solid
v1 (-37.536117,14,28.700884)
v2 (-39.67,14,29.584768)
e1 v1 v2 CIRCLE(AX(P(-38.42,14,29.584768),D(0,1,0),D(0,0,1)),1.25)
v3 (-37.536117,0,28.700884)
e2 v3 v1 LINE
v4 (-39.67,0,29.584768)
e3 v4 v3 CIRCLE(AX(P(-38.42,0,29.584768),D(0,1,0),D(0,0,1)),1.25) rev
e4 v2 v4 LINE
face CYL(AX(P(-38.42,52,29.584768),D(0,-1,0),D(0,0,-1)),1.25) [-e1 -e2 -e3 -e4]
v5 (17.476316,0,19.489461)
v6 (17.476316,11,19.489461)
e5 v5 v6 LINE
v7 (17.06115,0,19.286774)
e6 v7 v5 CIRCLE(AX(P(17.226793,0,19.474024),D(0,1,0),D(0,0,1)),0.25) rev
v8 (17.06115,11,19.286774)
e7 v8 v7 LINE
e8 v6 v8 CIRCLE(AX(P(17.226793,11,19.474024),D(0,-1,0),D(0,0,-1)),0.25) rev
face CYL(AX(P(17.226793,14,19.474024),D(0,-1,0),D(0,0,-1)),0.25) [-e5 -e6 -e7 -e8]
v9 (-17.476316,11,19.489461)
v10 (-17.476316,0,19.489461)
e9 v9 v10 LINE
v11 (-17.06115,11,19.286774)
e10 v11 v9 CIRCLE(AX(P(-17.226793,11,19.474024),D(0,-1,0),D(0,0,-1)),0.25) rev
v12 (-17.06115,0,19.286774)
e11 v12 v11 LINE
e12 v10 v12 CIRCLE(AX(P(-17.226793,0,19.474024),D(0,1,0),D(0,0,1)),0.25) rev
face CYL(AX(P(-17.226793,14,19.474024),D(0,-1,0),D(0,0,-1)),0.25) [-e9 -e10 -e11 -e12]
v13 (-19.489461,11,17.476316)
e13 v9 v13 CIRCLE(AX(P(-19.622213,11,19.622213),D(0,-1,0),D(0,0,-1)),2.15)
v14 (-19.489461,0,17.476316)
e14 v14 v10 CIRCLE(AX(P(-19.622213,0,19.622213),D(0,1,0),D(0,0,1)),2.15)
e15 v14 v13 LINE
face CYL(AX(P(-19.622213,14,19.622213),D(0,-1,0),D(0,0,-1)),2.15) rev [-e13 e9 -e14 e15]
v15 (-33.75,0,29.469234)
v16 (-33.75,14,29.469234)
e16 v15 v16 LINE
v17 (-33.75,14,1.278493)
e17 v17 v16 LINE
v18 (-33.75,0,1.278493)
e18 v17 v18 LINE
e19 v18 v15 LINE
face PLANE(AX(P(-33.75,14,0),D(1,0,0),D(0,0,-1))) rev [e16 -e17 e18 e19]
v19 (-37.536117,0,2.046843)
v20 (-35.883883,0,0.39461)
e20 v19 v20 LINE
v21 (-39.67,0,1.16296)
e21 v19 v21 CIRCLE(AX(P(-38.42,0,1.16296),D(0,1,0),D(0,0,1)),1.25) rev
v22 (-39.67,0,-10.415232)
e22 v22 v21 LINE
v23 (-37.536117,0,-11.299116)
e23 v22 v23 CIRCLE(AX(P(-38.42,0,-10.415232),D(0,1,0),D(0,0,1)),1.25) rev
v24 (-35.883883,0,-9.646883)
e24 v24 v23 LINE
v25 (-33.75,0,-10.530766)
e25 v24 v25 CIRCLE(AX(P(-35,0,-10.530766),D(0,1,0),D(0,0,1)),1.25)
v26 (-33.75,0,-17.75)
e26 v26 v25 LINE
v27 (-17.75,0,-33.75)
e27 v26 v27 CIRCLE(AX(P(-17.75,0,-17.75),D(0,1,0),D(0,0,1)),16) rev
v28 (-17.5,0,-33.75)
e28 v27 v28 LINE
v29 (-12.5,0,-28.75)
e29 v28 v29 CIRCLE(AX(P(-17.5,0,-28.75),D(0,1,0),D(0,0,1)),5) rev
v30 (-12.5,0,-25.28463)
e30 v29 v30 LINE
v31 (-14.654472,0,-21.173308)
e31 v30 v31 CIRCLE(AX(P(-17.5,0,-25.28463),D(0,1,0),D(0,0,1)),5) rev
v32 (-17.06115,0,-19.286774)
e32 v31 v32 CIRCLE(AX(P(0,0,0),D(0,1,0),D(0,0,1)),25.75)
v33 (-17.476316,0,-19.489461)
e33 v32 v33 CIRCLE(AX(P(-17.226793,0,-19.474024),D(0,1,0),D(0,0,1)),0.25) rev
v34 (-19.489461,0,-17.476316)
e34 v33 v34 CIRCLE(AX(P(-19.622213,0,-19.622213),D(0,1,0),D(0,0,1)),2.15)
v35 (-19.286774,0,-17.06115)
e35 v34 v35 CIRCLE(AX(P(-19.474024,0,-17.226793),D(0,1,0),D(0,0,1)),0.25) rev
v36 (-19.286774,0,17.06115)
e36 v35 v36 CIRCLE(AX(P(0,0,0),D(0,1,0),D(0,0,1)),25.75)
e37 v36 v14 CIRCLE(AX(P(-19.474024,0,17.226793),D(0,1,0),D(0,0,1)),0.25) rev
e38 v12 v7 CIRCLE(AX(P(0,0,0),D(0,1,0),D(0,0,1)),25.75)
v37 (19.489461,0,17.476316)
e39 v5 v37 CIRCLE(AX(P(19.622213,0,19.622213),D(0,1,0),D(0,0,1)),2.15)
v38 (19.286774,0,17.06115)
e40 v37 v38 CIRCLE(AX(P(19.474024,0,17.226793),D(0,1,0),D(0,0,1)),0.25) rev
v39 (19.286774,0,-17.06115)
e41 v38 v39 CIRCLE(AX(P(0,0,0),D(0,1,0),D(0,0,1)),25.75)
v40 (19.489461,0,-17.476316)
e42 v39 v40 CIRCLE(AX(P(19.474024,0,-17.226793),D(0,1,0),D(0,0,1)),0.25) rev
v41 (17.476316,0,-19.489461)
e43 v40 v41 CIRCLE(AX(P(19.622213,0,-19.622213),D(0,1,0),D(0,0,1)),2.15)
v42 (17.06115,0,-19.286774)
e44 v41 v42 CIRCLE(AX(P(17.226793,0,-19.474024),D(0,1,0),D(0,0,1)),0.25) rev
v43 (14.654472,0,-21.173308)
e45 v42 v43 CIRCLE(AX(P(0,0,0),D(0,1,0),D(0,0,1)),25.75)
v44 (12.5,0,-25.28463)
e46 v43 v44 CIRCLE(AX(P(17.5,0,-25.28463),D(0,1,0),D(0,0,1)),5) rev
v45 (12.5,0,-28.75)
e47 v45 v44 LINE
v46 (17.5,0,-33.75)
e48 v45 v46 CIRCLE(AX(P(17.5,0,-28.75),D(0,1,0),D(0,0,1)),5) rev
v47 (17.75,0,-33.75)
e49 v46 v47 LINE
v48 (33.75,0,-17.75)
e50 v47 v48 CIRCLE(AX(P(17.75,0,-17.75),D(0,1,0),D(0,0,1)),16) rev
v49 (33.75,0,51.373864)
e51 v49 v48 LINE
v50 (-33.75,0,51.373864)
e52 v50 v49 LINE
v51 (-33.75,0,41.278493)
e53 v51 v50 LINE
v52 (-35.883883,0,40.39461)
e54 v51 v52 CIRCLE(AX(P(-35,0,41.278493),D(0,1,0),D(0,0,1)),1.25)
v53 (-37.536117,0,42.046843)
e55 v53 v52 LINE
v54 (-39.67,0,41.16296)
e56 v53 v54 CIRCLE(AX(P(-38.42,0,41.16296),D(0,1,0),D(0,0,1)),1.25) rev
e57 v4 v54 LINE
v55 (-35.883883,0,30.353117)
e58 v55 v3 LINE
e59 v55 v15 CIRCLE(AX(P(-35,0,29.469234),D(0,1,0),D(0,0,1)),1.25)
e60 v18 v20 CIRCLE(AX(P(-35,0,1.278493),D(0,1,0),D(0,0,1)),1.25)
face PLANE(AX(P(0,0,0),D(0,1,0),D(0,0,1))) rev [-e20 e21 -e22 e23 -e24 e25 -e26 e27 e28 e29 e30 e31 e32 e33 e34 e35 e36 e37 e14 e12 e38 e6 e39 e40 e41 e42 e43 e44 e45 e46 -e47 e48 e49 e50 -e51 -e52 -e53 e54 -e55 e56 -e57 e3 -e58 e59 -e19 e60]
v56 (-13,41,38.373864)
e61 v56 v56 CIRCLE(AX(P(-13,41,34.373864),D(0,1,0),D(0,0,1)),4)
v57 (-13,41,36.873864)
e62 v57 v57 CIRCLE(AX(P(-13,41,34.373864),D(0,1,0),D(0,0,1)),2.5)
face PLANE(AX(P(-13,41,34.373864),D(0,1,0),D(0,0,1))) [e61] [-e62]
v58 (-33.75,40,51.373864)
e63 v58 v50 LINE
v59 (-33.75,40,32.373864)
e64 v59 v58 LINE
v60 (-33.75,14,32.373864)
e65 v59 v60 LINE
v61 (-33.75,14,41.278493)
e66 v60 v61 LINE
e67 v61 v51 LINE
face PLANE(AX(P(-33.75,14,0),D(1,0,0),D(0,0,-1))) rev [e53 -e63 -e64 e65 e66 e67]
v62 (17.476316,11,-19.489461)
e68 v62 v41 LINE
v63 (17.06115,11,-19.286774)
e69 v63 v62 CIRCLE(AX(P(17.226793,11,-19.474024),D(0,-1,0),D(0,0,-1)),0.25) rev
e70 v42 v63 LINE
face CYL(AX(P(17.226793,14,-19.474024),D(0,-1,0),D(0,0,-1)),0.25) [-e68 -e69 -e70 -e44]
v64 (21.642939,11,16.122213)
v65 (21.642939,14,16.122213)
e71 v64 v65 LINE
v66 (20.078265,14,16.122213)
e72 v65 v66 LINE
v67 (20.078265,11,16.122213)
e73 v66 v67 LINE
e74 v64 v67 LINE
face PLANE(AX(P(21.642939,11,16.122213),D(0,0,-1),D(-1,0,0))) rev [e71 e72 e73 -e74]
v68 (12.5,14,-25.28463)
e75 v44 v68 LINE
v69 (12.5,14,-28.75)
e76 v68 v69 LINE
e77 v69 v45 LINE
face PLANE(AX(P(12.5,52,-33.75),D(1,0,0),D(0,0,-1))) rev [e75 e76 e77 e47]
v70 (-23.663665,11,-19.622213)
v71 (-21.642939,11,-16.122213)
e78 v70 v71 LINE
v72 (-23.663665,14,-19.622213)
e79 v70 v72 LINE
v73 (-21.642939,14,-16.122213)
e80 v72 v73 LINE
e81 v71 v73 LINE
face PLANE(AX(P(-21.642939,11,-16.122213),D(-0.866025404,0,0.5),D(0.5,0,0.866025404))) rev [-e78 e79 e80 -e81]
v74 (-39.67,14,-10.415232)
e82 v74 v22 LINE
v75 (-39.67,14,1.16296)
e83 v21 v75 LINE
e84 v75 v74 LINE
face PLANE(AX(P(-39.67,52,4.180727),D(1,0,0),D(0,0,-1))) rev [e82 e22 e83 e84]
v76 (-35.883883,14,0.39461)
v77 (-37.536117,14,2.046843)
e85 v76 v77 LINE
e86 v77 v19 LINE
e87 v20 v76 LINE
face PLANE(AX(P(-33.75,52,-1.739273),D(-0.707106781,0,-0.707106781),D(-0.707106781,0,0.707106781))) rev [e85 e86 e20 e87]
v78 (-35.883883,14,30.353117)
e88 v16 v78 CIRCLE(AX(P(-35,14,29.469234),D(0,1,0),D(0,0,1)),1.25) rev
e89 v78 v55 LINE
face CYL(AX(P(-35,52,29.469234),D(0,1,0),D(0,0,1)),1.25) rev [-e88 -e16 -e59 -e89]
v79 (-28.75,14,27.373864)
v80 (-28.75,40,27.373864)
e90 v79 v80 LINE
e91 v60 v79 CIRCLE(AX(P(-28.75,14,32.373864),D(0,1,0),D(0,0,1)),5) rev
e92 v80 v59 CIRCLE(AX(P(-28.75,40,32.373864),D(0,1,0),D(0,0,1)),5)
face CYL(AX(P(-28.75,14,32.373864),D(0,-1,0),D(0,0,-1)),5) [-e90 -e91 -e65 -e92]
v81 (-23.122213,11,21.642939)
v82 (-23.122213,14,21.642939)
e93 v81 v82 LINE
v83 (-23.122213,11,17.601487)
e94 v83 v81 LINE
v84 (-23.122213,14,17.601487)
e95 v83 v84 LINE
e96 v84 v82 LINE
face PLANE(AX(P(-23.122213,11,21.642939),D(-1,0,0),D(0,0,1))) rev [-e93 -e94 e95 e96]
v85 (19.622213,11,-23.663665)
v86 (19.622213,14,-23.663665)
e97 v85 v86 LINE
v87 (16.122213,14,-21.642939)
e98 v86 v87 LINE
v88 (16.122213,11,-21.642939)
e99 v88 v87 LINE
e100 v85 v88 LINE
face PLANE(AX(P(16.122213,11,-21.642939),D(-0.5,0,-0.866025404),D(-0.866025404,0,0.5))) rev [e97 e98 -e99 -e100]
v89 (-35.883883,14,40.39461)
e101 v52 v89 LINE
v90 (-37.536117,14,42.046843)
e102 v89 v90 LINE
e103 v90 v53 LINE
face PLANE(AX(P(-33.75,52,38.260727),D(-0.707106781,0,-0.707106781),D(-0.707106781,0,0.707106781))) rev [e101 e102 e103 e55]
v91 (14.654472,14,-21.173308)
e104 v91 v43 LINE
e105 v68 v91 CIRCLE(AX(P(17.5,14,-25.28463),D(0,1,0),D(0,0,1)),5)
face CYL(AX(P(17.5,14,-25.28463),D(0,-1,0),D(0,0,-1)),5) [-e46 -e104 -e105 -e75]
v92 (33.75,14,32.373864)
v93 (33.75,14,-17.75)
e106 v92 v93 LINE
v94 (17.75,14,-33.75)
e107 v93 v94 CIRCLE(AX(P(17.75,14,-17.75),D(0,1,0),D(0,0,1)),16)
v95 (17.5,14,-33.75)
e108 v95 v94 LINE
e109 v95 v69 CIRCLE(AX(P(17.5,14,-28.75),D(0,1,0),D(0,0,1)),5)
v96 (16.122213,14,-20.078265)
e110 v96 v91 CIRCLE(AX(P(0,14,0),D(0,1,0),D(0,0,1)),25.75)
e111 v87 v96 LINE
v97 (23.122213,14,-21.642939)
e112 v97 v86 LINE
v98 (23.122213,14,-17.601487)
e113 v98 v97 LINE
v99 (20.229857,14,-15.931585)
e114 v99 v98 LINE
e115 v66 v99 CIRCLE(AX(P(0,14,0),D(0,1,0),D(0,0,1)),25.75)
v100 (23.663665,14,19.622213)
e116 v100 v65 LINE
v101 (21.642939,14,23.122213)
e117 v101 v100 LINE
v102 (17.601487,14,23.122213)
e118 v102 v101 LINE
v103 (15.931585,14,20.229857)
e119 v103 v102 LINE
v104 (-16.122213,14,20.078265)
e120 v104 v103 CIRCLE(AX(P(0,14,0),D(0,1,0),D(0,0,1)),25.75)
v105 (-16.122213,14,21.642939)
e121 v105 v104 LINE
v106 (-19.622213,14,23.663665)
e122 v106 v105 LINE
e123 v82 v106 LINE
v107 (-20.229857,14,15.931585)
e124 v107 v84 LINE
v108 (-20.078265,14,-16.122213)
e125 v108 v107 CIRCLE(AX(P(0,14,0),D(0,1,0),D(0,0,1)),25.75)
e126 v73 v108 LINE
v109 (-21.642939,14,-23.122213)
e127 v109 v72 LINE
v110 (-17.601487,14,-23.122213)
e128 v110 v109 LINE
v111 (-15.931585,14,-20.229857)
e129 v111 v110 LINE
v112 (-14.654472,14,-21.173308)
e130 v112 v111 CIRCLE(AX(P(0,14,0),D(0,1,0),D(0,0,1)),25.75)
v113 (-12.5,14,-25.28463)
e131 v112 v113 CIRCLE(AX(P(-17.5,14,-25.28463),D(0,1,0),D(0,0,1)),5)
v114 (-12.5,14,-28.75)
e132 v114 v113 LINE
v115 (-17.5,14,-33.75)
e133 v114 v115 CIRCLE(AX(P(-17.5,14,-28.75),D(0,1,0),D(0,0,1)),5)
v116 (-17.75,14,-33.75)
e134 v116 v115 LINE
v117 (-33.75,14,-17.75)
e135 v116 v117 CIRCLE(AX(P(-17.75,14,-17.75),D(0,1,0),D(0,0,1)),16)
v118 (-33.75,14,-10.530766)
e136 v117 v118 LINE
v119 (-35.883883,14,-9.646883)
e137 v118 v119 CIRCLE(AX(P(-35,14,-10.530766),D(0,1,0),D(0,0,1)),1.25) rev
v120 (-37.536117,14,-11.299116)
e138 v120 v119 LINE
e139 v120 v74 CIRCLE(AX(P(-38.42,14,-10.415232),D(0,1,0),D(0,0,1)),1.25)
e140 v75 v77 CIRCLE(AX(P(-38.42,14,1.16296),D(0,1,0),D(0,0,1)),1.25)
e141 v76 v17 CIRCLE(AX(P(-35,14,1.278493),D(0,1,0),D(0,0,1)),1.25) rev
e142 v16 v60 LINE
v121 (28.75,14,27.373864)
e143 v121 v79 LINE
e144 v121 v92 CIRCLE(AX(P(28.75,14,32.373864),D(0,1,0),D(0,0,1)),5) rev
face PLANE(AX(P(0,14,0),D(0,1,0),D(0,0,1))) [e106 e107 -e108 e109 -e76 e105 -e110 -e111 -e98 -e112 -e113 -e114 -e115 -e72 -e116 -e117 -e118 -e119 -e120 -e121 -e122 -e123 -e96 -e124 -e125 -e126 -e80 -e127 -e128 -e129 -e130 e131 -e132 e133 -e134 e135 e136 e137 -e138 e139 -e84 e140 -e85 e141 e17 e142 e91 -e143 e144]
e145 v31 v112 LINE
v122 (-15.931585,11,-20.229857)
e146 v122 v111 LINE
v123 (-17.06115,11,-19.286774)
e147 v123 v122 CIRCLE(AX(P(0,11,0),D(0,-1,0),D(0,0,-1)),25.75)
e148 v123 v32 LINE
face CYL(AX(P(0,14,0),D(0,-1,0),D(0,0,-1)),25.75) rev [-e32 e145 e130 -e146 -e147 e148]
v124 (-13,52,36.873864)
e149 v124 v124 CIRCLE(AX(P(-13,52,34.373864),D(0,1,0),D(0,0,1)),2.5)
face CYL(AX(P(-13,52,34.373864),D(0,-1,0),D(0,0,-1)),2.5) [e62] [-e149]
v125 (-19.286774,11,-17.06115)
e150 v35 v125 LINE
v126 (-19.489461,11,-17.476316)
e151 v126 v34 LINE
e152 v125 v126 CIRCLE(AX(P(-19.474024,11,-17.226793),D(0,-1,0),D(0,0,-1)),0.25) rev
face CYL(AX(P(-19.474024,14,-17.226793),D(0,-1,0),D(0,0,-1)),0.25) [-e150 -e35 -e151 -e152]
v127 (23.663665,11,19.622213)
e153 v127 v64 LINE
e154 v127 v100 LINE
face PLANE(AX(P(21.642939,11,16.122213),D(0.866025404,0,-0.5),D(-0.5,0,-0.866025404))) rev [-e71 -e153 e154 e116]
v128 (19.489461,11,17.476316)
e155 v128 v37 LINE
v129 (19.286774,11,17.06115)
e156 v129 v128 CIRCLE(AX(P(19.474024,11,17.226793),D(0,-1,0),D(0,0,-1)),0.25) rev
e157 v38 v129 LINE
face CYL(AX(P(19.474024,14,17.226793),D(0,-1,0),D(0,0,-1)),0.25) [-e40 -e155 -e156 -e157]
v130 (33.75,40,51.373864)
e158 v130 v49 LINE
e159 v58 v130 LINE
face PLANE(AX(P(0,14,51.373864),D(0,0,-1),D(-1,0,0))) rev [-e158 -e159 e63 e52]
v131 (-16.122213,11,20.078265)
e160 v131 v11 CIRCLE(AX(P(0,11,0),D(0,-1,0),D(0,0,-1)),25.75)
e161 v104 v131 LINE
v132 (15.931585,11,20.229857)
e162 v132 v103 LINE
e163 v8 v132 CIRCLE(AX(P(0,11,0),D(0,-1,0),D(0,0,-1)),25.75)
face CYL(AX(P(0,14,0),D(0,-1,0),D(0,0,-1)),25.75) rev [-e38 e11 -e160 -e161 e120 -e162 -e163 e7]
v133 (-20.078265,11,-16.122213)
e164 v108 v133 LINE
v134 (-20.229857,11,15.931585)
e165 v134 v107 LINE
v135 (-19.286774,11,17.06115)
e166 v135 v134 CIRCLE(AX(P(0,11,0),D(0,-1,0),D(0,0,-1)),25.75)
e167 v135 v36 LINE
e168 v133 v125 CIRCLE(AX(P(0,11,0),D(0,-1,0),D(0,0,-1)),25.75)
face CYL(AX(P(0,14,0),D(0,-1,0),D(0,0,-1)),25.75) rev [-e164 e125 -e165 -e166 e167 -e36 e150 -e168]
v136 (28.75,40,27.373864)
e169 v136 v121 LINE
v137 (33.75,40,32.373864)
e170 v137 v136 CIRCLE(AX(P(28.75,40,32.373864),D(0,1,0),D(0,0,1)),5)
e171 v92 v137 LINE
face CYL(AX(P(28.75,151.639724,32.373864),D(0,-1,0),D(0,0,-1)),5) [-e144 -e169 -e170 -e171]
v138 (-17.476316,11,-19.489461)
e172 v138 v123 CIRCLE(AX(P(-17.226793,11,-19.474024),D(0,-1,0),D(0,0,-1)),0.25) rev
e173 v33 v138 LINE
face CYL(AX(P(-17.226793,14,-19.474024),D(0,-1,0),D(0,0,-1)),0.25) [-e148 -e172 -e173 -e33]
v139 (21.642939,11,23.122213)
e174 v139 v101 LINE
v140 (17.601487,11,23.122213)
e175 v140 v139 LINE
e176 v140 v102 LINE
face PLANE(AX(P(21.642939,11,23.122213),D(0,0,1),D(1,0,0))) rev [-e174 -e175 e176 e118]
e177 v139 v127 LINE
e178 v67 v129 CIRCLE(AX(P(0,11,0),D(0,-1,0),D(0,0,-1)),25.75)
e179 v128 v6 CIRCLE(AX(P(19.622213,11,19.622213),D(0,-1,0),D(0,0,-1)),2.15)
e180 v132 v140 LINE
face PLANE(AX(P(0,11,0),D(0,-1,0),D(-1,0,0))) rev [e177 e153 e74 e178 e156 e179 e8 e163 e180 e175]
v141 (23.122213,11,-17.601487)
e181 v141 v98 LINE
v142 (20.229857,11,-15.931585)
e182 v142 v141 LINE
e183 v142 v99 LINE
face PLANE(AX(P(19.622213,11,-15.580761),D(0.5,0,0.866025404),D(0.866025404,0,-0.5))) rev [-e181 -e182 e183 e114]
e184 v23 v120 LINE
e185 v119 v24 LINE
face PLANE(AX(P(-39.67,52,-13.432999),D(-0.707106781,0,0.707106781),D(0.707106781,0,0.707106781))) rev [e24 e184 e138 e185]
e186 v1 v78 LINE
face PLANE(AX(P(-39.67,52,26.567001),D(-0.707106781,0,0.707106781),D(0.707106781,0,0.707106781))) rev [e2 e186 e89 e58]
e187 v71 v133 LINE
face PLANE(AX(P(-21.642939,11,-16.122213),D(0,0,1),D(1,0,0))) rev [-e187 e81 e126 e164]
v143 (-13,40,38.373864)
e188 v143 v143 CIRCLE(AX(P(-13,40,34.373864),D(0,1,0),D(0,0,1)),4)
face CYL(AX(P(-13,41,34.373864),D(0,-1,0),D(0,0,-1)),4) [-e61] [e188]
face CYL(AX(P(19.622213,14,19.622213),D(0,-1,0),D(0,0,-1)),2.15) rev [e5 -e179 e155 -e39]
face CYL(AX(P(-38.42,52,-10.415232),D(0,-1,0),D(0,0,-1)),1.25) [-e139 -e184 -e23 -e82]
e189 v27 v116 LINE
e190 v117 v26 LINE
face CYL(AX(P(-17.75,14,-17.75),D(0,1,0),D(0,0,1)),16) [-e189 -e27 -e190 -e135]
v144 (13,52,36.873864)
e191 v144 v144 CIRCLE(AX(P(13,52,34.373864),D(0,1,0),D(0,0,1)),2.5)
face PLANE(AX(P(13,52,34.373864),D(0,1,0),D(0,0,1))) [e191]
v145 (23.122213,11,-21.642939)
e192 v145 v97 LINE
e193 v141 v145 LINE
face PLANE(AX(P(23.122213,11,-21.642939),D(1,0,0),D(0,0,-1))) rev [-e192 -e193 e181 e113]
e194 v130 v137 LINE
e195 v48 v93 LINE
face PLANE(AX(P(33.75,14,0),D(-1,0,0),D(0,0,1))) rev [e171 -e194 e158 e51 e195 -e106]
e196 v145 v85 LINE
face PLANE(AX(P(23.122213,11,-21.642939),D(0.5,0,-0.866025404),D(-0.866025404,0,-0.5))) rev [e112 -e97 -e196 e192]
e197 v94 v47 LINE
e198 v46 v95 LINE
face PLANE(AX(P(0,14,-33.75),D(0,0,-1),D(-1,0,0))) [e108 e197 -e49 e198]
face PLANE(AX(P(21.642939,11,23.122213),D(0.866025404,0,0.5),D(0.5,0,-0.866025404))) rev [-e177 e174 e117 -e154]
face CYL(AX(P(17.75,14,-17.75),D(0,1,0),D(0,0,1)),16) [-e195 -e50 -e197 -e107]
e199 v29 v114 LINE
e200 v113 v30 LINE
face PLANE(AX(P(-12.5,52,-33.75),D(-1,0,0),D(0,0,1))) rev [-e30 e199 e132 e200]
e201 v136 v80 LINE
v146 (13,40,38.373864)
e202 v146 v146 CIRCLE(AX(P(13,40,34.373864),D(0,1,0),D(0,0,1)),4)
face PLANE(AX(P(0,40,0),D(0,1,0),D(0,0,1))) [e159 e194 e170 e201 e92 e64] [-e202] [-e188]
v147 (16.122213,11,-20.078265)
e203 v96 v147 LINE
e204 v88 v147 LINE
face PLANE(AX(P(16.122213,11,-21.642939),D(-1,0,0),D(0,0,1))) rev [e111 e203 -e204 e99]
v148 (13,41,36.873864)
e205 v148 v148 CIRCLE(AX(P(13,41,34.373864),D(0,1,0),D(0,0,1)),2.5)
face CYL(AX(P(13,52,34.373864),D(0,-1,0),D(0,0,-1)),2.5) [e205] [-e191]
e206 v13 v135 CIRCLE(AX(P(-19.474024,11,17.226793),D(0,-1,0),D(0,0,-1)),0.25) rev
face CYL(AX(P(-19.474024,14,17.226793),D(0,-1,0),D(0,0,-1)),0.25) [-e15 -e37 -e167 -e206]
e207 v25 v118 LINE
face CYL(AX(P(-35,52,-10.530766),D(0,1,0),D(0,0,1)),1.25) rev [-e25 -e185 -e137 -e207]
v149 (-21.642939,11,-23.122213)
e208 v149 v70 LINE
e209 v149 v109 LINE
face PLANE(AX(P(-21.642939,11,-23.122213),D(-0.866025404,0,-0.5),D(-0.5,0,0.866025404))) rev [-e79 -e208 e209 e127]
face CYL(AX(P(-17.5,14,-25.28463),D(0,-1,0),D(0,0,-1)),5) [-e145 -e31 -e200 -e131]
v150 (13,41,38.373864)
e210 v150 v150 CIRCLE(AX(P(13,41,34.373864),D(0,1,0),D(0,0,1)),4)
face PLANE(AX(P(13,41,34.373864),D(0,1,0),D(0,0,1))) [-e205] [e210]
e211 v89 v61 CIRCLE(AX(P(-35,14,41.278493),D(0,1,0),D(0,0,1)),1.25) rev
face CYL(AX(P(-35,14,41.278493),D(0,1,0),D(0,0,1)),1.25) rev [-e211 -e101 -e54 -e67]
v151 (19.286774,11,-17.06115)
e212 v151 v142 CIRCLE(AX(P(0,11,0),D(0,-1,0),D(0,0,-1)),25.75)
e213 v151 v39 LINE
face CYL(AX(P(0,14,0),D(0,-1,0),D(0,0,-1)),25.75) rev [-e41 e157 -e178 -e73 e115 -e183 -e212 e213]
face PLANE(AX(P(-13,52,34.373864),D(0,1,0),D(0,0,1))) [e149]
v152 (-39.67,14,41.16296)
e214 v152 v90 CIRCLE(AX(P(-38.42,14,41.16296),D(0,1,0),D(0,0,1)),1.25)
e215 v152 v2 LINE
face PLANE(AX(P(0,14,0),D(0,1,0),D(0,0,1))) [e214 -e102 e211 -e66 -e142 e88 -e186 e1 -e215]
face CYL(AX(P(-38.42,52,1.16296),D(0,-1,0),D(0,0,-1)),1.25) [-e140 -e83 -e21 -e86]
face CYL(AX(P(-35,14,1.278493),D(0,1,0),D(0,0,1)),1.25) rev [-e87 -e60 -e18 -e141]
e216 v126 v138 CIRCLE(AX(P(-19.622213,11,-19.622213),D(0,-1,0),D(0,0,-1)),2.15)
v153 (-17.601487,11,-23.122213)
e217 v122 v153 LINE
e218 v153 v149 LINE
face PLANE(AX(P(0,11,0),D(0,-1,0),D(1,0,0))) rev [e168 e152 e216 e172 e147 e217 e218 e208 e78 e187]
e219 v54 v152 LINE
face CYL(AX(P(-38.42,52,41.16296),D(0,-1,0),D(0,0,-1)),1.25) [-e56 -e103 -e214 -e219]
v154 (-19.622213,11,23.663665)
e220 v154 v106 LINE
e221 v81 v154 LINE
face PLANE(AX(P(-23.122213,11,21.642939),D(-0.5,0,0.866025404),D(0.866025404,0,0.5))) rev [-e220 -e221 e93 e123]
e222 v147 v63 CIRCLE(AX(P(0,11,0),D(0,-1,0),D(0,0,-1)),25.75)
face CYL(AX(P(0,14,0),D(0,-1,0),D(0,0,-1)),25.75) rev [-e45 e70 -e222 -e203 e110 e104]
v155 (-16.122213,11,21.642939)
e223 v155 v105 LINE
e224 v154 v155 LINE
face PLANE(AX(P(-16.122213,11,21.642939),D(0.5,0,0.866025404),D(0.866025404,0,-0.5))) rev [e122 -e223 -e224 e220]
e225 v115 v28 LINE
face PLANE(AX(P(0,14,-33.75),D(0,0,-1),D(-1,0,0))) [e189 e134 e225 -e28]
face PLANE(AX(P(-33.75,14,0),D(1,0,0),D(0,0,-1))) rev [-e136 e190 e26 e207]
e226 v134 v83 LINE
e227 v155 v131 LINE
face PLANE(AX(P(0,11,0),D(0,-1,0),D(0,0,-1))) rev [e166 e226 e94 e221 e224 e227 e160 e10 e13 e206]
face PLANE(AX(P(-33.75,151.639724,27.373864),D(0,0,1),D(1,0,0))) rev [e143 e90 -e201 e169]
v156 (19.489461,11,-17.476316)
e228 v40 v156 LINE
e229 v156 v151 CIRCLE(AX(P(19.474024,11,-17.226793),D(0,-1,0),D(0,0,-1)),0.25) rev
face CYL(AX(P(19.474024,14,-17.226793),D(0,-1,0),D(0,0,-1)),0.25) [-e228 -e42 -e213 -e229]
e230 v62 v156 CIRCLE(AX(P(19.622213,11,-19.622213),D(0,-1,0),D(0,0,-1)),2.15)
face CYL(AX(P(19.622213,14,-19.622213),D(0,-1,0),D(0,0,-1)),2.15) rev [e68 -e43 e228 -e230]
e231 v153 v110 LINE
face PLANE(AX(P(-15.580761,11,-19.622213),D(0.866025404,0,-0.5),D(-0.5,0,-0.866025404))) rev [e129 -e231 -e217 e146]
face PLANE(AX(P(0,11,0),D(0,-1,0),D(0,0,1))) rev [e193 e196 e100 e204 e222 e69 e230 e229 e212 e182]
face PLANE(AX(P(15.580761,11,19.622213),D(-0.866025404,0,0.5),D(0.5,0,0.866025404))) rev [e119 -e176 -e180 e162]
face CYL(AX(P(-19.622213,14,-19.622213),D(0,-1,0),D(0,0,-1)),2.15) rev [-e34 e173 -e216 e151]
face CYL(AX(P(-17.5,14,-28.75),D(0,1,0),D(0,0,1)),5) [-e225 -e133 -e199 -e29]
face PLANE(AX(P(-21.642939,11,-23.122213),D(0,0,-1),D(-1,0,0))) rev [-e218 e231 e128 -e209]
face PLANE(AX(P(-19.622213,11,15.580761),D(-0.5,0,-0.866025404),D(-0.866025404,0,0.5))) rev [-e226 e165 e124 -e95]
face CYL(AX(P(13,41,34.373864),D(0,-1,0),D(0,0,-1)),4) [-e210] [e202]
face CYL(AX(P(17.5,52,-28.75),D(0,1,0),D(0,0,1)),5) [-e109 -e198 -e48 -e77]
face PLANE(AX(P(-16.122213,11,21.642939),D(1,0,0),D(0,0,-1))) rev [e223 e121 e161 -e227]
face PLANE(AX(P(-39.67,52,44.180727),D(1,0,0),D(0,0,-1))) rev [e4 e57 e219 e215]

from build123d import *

# Parameters (mm, degrees)
SKETCH1_W           = 67.5
SKETCH1_H           = 85.123863618
BOSS_EXTRUDE1_DEPTH = 14
SKETCH2_W           = 67.5
SKETCH2_H           = 24
BOSS_EXTRUDE2_DEPTH = 26
SKETCH3_R           = 2.5
BOSS_EXTRUDE3_DEPTH = 12
FILLET1_R           = 0.25
SKETCH4_R           = 4
BOSS_EXTRUDE4_DEPTH = 1
SKETCH5_W           = 25
SKETCH5_H           = 20
CUT_EXTRUDE1_DEPTH  = 81.512957839
FILLET2_R           = 5
FILLET3_R           = 16
BOSS_EXTRUDE5_DEPTH = 14
CUT_EXTRUDE2_DEPTH  = 84.206588569
FILLET4_START       = -1
FILLET4_DEPTH       = 15
FILLET4_2_DEPTH     = 14
CUT_EXTRUDE3_DEPTH  = 3
CIRPATTERN1_COUNT   = 4


with BuildPart() as part:
    # Sketch1 → Boss-Extrude1 (new body)
    with BuildSketch(Plane(origin=(0, 0, 0), x_dir=(1, 0, 0), z_dir=(0, 1, 0))):
        with Locations((0, -8.811931809)):
            Rectangle(SKETCH1_W, SKETCH1_H)
        with BuildLine():
            ThreePointArc((18.737427526, 17.66270958), (23.93273134, 9.50194036), (25.75, 0))
            ThreePointArc((25.75, 0), (23.93273134, -9.50194036), (18.737427526, -17.66270958))
            ThreePointArc((18.737427526, -17.66270958), (20.788448756, -17.816003175), (21.772213178, -19.622213178))
            ThreePointArc((21.772213178, -19.622213178), (19.169682922, -21.724049605), (17.66270958, -18.737427526))
            ThreePointArc((17.66270958, -18.737427526), (0, -25.75), (-17.66270958, -18.737427526))
            ThreePointArc((-17.66270958, -18.737427526), (-17.52037675, -19.169682922), (-17.472213178, -19.622213178))
            ThreePointArc((-17.472213178, -19.622213178), (-21.428423181, -20.788448756), (-18.737427526, -17.66270958))
            ThreePointArc((-18.737427526, -17.66270958), (-25.75, 0), (-18.737427526, 17.66270958))
            ThreePointArc((-18.737427526, 17.66270958), (-21.428423181, 20.788448756), (-17.472213178, 19.622213178))
            ThreePointArc((-17.472213178, 19.622213178), (-17.52037675, 19.169682922), (-17.66270958, 18.737427526))
            ThreePointArc((-17.66270958, 18.737427526), (0, 25.75), (17.66270958, 18.737427526))
            ThreePointArc((17.66270958, 18.737427526), (19.169682922, 21.724049605), (21.772213178, 19.622213178))
            ThreePointArc((21.772213178, 19.622213178), (20.788448756, 17.816003175), (18.737427526, 17.66270958))
        make_face(mode=Mode.SUBTRACT)
    extrude(amount=BOSS_EXTRUDE1_DEPTH)

    # Sketch2 → Boss-Extrude2 (add)
    with BuildSketch(Plane(origin=(0, 14, 0), x_dir=(1, 0, 0), z_dir=(0, 1, 0))):
        with Locations((0, -39.373863618)):
            Rectangle(SKETCH2_W, SKETCH2_H)
    extrude(amount=BOSS_EXTRUDE2_DEPTH)

    # Sketch3 → Boss-Extrude3 (add)
    with BuildSketch(Plane(origin=(0, 40, 0), x_dir=(1, 0, 0), z_dir=(0, 1, 0))):
        with Locations(Location((13, -34.373863618, 0), (0, 0, 270))):
            Circle(SKETCH3_R)
        with Locations(Location((-13, -34.373863618, 0), (0, 0, 270))):
            Circle(SKETCH3_R)
    extrude(amount=BOSS_EXTRUDE3_DEPTH)

    # Fillet1
    fillet1_edges = [part.edges().sort_by_distance(p)[0] for p in [
        (-17.66270958, 7, 18.737427526),
        (17.66270958, 7, 18.737427526),
        (18.737427526, 7, 17.66270958),
        (18.737427526, 7, -17.66270958),
        (17.66270958, 7, -18.737427526),
        (-17.66270958, 7, -18.737427526),
        (-18.737427526, 7, -17.66270958),
        (-18.737427526, 7, 17.66270958),
    ]]
    fillet(fillet1_edges, radius=FILLET1_R)

    # Sketch4 → Boss-Extrude4 (add)
    with BuildSketch(Plane(origin=(0, 40, 0), x_dir=(1, 0, 0), z_dir=(0, 1, 0))):
        with Locations(Location((13, -34.373863618, 0), (0, 0, 270))):
            Circle(SKETCH4_R)
        with Locations(Location((-13, -34.373863618, 0), (0, 0, 270))):
            Circle(SKETCH4_R)
    extrude(amount=BOSS_EXTRUDE4_DEPTH)

    # Sketch5 → Cut-Extrude1 (cut, through all)
    with BuildSketch(Plane.XZ):
        with Locations((0, -23.75)):
            Rectangle(SKETCH5_W, SKETCH5_H)
    extrude(amount=-CUT_EXTRUDE1_DEPTH, mode=Mode.SUBTRACT)

    # Fillet2
    fillet2_edges = [part.edges().sort_by_distance(p)[0] for p in [
        (12.5, 7, -22.51249653),
        (-12.5, 7, -22.51249653),
        (12.5, 7, -33.75),
        (-12.5, 7, -33.75),
        (-33.75, 27, 27.373863618),
        (33.75, 27, 27.373863618),
    ]]
    fillet(fillet2_edges, radius=FILLET2_R)

    # Fillet3
    fillet3_edges = [part.edges().sort_by_distance(p)[0] for p in [
        (33.75, 7, -33.75),
        (-33.75, 7, -33.75),
    ]]
    fillet(fillet3_edges, radius=FILLET3_R)

    # Sketch6 → Boss-Extrude5 (add)
    with BuildSketch(Plane.XZ):
        Polygon((-33.75, 38.373863618), (-39.75, 44.373863618), (-39.75, 26.373863618), (-33.75, 32.373863618), align=None)
        Polygon((-39.75, 4.373863618), (-33.75, -1.626136382), (-33.75, -7.626136382), (-39.75, -13.626136382), align=None)
    extrude(amount=-BOSS_EXTRUDE5_DEPTH)

    # Sketch7 → Cut-Extrude2 (cut, through all)
    with BuildSketch(Plane.XZ):
        Polygon((-33.75, -7.626136382), (-33.75, -7.512999297), (-39.67, -13.432999297), (-39.67, 4.180726533), (-33.75, -1.739273467), (-33.75, -1.626136382), (-39.75, 4.373863618), (-39.75, -13.626136382), align=None)
        Polygon((-33.75, 32.373863618), (-33.75, 32.487000703), (-39.67, 26.567000703), (-39.67, 44.180726533), (-33.75, 38.260726533), (-33.75, 38.373863618), (-39.75, 44.373863618), (-39.75, 26.373863618), align=None)
    extrude(amount=-CUT_EXTRUDE2_DEPTH, mode=Mode.SUBTRACT)

    # Fillet4: read off the stored shape, not the designer's step
    # Fillet4 outline → Fillet4 (cut)
    with BuildSketch(Plane(origin=(0, 0, 0), x_dir=(1, 0, 0), z_dir=(0, 1, 0)).offset(FILLET4_START)):
        with BuildLine():
            Line((-39.67, -26.567000703), (-39.67, -29.584767656))
            ThreePointArc((-39.67, -29.584767656), (-38.898354291, -28.42991824), (-37.536116524, -28.700884179))
            Line((-37.536116524, -28.700884179), (-39.67, -26.567000703))
        make_face()
        with BuildLine():
            Line((-39.67, 13.432999297), (-39.67, 10.415232344))
            ThreePointArc((-39.67, 10.415232344), (-38.898354291, 11.57008176), (-37.536116524, 11.299115821))
            Line((-37.536116524, 11.299115821), (-39.67, 13.432999297))
        make_face()
        with BuildLine():
            Line((-39.67, -4.180726533), (-37.536116524, -2.046843056))
            ThreePointArc((-37.536116524, -2.046843056), (-38.89835429, -2.317808995), (-39.67, -1.16295958))
            Line((-39.67, -1.16295958), (-39.67, -4.180726533))
        make_face()
        with BuildLine():
            ThreePointArc((-37.536116524, -42.046843056), (-38.89835429, -42.317808995), (-39.67, -41.16295958))
            Line((-39.67, -41.16295958), (-39.67, -44.180726533))
            Line((-39.67, -44.180726533), (-37.536116524, -42.046843056))
        make_face()
    extrude(amount=FILLET4_DEPTH, mode=Mode.SUBTRACT)

    # Fillet4 2 outline → Fillet4 2 (add)
    with BuildSketch(Plane(origin=(0, 0, 0), x_dir=(1, 0, 0), z_dir=(0, 1, 0))):
        with BuildLine():
            ThreePointArc((-33.75, 10.53076625), (-34.52164571, 9.375916835), (-35.883883476, 9.646882774))
            Line((-35.883883476, 9.646882774), (-33.75, 7.512999297))
            Line((-33.75, 7.512999297), (-33.75, 10.53076625))
        make_face()
        with BuildLine():
            ThreePointArc((-35.883883476, -0.394610009), (-34.521645709, -0.12364407), (-33.75, -1.278493486))
            Line((-33.75, -1.278493486), (-33.75, 1.739273467))
            Line((-33.75, 1.739273467), (-35.883883476, -0.394610009))
        make_face()
        with BuildLine():
            ThreePointArc((-33.75, -29.46923375), (-34.52164571, -30.624083165), (-35.883883476, -30.353117226))
            Line((-35.883883476, -30.353117226), (-33.75, -32.487000703))
            Line((-33.75, -32.487000703), (-33.75, -29.46923375))
        make_face()
        with BuildLine():
            Line((-33.75, -38.260726533), (-35.883883476, -40.394610009))
            ThreePointArc((-35.883883476, -40.394610009), (-34.521645709, -40.12364407), (-33.75, -41.278493486))
            Line((-33.75, -41.278493486), (-33.75, -38.260726533))
        make_face()
    extrude(amount=FILLET4_2_DEPTH)

    # Sketch8 → Cut-Extrude3 (cut)
    with BuildSketch(Plane(origin=(0, 14, 0), x_dir=(1, 0, 0), z_dir=(0, 1, 0))):
        Polygon((-19.622213178, -15.580761294), (-16.122213178, -17.601487236), (-16.122213178, -21.64293912), (-19.622213178, -23.663665062), (-23.122213178, -21.64293912), (-23.122213178, -17.601487236), align=None)
    cut_extrude3 = extrude(amount=-CUT_EXTRUDE3_DEPTH, mode=Mode.SUBTRACT)

    # CirPattern1: Cut-Extrude3 ×4 about axis
    cirpattern1_axis = Axis((0, 0, 0), (0, 1, 0))
    for i in range(1, CIRPATTERN1_COUNT):
        add(cut_extrude3.rotate(cirpattern1_axis, i * 360 / CIRPATTERN1_COUNT), mode=Mode.SUBTRACT)


solid = part.part
